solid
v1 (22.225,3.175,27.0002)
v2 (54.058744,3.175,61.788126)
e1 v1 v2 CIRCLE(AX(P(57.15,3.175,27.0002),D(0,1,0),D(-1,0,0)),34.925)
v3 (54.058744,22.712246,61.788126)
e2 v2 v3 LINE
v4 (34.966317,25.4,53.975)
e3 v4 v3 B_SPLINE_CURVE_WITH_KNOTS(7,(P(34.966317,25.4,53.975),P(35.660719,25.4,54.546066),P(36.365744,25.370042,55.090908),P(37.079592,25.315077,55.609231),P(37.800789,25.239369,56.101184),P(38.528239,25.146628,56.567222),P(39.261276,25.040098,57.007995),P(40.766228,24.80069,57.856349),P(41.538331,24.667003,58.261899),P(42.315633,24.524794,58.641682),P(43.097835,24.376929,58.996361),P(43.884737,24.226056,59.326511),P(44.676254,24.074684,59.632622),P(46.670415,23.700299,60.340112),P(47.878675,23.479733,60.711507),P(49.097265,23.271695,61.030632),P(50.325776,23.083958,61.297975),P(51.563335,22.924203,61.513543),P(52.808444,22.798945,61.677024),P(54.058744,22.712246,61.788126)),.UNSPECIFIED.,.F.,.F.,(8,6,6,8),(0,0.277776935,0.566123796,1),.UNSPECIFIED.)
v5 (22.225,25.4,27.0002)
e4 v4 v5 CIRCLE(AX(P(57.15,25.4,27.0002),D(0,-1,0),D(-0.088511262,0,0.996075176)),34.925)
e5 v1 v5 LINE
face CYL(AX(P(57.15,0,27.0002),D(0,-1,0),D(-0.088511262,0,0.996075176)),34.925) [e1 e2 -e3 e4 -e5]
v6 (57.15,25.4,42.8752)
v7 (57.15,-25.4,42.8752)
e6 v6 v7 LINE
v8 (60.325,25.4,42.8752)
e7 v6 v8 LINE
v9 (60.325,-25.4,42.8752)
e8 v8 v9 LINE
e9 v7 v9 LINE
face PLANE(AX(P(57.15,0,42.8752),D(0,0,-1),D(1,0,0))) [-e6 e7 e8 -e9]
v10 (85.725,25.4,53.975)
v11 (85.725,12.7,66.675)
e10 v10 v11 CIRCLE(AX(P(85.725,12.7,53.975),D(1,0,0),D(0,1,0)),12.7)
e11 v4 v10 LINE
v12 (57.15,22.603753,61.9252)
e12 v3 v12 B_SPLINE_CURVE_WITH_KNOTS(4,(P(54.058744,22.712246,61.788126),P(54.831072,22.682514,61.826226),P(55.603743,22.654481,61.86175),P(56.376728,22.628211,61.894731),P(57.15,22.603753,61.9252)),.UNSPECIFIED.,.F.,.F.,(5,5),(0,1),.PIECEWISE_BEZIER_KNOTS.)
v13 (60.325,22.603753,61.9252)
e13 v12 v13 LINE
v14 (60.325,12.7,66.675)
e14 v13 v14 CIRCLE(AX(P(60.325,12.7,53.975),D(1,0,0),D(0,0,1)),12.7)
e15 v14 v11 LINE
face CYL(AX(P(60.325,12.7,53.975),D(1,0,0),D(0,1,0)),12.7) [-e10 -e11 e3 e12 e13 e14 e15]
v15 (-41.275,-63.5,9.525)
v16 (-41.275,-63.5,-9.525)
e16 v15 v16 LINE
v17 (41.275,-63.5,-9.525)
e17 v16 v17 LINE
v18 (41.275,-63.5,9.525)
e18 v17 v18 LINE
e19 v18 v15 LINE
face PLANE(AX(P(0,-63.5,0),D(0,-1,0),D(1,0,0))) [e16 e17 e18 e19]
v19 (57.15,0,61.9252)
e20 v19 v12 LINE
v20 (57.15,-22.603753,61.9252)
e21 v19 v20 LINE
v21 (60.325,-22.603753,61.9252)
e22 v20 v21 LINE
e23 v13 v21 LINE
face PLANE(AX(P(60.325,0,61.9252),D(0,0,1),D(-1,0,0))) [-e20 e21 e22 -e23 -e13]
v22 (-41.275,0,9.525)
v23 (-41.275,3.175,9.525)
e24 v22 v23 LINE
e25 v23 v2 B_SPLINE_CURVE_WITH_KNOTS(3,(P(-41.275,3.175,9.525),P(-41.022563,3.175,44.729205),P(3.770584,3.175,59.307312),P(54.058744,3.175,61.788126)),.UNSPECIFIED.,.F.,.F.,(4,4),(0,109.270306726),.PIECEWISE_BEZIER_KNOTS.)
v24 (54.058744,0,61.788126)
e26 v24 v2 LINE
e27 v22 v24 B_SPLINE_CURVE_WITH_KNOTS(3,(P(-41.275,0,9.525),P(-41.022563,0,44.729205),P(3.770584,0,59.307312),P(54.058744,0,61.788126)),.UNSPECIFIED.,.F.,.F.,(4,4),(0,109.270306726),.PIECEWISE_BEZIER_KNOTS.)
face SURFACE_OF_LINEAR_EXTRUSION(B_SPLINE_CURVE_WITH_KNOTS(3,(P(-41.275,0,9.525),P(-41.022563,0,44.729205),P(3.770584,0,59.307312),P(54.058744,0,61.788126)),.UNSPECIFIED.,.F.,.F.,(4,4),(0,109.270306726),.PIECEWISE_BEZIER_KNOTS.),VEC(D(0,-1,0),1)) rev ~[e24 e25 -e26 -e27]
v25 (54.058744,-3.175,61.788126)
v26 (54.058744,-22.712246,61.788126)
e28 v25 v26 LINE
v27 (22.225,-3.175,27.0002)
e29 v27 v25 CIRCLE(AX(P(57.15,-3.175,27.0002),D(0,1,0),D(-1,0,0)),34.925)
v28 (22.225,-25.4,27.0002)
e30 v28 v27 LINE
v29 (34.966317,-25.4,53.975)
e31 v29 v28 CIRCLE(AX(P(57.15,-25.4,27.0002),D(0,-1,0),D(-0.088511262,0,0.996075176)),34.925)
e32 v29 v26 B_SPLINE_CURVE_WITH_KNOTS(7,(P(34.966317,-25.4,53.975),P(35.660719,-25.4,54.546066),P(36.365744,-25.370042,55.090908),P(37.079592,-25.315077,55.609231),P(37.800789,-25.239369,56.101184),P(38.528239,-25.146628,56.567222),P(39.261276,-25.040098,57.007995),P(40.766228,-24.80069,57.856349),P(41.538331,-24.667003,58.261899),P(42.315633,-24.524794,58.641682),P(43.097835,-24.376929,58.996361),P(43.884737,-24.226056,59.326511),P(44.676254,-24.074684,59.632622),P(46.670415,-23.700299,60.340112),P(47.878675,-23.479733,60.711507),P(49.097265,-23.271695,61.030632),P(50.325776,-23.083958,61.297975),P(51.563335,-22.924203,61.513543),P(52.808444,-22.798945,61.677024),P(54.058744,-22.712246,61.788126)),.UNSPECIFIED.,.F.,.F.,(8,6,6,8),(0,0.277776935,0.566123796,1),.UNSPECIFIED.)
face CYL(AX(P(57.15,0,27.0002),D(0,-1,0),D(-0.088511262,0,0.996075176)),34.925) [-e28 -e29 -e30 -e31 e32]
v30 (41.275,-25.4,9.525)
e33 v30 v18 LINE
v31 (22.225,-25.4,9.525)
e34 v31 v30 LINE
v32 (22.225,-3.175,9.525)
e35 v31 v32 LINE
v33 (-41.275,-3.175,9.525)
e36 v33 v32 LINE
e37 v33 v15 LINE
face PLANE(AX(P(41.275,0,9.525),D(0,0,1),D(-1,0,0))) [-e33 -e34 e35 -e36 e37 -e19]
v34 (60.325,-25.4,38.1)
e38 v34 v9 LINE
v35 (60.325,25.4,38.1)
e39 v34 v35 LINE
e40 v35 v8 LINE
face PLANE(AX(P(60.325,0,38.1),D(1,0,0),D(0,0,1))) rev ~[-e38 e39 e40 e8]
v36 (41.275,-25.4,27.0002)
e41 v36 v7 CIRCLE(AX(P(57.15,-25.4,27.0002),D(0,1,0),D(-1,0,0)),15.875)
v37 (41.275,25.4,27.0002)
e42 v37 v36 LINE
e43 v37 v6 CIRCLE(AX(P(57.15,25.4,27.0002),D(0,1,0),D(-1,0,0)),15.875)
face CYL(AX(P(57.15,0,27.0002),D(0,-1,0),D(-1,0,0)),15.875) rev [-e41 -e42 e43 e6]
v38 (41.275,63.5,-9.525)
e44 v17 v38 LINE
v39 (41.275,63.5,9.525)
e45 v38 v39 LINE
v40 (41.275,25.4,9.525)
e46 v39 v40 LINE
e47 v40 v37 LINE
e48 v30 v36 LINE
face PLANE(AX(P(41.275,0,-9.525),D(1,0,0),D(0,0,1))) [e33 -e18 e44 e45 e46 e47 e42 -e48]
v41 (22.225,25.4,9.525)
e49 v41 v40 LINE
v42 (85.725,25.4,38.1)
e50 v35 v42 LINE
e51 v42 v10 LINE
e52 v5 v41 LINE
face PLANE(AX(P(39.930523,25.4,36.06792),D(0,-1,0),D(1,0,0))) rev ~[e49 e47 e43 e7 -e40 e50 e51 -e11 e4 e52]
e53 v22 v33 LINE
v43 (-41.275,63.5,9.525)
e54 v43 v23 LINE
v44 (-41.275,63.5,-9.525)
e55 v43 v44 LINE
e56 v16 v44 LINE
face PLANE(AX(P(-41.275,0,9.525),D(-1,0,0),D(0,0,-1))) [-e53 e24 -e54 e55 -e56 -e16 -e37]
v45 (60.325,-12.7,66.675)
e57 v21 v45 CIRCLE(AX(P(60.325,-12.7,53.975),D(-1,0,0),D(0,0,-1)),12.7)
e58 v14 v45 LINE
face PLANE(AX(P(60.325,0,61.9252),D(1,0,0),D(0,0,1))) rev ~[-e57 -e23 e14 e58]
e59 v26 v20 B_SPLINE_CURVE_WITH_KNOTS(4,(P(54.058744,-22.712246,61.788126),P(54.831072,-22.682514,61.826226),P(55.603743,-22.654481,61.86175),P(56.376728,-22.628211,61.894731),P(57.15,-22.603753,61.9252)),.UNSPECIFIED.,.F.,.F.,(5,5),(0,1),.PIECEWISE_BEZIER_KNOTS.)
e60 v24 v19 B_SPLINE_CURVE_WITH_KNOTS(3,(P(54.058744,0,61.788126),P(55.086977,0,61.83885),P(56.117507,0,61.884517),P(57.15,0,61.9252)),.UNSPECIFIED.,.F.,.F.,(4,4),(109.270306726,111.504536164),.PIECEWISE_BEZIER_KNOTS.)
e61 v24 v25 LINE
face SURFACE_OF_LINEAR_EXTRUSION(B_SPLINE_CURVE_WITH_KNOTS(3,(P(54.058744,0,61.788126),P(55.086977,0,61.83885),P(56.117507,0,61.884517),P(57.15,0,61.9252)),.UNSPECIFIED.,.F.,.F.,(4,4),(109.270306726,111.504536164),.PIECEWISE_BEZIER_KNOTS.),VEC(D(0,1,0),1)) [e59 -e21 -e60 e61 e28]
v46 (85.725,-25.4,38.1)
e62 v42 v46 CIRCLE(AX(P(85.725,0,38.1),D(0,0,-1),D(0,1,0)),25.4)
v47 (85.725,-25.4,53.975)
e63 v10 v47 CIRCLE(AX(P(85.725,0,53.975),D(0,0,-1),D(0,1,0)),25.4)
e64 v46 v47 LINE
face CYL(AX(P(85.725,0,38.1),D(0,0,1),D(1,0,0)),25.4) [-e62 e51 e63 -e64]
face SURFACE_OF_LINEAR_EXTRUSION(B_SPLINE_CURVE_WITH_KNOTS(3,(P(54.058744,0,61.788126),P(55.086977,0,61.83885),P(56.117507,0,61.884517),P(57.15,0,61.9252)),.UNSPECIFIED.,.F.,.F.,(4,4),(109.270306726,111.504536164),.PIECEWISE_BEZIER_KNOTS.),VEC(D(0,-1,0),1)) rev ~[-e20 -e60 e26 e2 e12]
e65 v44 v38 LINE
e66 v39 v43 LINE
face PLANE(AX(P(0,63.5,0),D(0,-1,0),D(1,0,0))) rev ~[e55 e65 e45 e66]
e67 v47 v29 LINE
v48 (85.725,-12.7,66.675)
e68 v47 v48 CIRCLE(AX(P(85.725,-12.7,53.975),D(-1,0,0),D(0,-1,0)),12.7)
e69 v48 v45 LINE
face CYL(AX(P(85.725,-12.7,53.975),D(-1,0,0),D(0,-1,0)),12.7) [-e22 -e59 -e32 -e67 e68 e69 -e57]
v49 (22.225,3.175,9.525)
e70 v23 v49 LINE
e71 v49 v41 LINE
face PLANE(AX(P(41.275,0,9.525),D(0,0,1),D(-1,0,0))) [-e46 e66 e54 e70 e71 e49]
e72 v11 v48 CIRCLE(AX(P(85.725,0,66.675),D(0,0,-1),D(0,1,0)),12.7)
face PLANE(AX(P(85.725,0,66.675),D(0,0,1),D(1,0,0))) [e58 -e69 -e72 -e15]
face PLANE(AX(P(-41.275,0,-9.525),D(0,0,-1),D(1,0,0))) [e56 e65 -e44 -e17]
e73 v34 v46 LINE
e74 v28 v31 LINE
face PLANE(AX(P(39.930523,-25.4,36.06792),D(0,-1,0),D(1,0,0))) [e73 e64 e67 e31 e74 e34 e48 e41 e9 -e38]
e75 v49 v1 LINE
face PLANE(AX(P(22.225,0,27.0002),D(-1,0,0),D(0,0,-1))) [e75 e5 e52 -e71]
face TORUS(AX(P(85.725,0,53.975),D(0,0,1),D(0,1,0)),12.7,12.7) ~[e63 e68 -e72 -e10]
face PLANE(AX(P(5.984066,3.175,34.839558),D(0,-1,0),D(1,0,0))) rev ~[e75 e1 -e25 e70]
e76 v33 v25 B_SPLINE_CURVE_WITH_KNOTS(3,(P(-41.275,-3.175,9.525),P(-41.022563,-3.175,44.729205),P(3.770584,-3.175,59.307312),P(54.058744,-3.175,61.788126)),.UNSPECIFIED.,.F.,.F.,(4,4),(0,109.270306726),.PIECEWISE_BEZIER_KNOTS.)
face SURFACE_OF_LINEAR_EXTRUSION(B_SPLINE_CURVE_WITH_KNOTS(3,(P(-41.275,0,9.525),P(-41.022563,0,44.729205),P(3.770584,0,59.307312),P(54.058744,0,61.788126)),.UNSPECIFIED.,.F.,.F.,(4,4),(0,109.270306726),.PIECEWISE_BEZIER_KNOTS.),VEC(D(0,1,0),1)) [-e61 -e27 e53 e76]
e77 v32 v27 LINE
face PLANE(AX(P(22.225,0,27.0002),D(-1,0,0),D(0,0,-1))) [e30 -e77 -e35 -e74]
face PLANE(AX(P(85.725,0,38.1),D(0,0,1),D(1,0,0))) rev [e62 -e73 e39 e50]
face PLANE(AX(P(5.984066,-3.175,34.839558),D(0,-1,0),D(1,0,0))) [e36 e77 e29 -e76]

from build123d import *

# Parameters (mm, degrees)
F1_DEPTH = 63.5
F0_W     = 25.4
F0_H     = 19.05
F0_H_2   = 4.7498
F0_H_3   = 4.7752
F2_DEPTH = 25.4
F4_DEPTH = 3.175
F5_R     = 12.7


with BuildPart() as f1:
    # F0 (on Front) → F1 (new body, symmetric)
    with BuildSketch(Plane.XZ):
        Polygon((41.275, -9.525), (41.275, 9.525), (22.225, 9.525), (-41.275, 9.525), (-41.275, -9.525), align=None)
    extrude(amount=F1_DEPTH, both=True)

    # F0 (on Front) → F2 (join, symmetric)
    with BuildSketch(Plane.XZ):
        with BuildLine():
            Line((22.225, 9.525), (41.275, 9.525))
            Line((41.275, 9.525), (41.275, 27.0002))
            ThreePointArc((41.275, 27.0002), (45.9246798487, 38.2255201513), (57.15, 42.8752))
            Line((57.15, 42.8752), (60.325, 42.8752))
            Line((60.325, 42.8752), (60.325, 61.9252))
            Line((60.325, 61.9252), (57.15, 61.9252))
            add(Edge.make_bspline(
                [(54.0587441636, 61.7881255253), (55.0869767217, 61.838850256), (56.1175065912, 61.8845174455), (57.15, 61.9252)],
                knots=[109.2703067259, 109.2703067259, 109.2703067259, 109.2703067259, 111.5045361635, 111.5045361635, 111.5045361635, 111.5045361635], degree=3))
            ThreePointArc((54.0587441636, 61.7881255253), (31.3845411928, 50.5776629139), (22.225, 27.0002))
            Line((22.225, 27.0002), (22.225, 9.525))
        make_face()
        with Locations((73.025, 52.4002)):
            Rectangle(F0_W, F0_H)
        with Locations((73.025, 64.3001)):
            Rectangle(F0_W, F0_H_2)
        with Locations((73.025, 40.4876)):
            Rectangle(F0_W, F0_H_3)
    extrude(amount=F2_DEPTH, both=True)

    # F0 (on Front) → F3 (revolve)
    with BuildSketch(Plane.XZ):
        Polygon((85.725, 61.9252), (85.725, 42.8752), (85.725, 38.1), (111.125, 38.1), (111.125, 66.675), (85.725, 66.675), align=None)
    revolve(axis=Axis((85.725, 0, 52.3875), (0, 0, 1)))

    # F0 (on Front) → F4 (join, symmetric)
    with BuildSketch(Plane.XZ):
        with BuildLine():
            Line((-41.275, 9.525), (22.225, 9.525))
            Line((22.225, 9.525), (22.225, 27.0002))
            ThreePointArc((22.225, 27.0002), (31.3845411928, 50.5776629139), (54.0587441636, 61.7881255253))
            add(Edge.make_bspline(
                [(-41.275, 9.525), (-41.0225634855, 44.7292047169), (3.7705843511, 59.3073118764), (54.0587441636, 61.7881255253)],
                knots=[0, 0, 0, 0, 109.2703067259, 109.2703067259, 109.2703067259, 109.2703067259], degree=3))
        make_face()
    extrude(amount=F4_DEPTH, both=True)

    # F5
    f5_edges = [f1.edges().sort_by_distance(p)[0] for p in [
        (85.725, 25.4, 52.3875),
        (73.025, 25.4, 66.675),
        (73.025, -25.4, 66.675),
        (111.125, 0, 66.675),
    ]]
    fillet(f5_edges, radius=F5_R)


solid = f1.part
